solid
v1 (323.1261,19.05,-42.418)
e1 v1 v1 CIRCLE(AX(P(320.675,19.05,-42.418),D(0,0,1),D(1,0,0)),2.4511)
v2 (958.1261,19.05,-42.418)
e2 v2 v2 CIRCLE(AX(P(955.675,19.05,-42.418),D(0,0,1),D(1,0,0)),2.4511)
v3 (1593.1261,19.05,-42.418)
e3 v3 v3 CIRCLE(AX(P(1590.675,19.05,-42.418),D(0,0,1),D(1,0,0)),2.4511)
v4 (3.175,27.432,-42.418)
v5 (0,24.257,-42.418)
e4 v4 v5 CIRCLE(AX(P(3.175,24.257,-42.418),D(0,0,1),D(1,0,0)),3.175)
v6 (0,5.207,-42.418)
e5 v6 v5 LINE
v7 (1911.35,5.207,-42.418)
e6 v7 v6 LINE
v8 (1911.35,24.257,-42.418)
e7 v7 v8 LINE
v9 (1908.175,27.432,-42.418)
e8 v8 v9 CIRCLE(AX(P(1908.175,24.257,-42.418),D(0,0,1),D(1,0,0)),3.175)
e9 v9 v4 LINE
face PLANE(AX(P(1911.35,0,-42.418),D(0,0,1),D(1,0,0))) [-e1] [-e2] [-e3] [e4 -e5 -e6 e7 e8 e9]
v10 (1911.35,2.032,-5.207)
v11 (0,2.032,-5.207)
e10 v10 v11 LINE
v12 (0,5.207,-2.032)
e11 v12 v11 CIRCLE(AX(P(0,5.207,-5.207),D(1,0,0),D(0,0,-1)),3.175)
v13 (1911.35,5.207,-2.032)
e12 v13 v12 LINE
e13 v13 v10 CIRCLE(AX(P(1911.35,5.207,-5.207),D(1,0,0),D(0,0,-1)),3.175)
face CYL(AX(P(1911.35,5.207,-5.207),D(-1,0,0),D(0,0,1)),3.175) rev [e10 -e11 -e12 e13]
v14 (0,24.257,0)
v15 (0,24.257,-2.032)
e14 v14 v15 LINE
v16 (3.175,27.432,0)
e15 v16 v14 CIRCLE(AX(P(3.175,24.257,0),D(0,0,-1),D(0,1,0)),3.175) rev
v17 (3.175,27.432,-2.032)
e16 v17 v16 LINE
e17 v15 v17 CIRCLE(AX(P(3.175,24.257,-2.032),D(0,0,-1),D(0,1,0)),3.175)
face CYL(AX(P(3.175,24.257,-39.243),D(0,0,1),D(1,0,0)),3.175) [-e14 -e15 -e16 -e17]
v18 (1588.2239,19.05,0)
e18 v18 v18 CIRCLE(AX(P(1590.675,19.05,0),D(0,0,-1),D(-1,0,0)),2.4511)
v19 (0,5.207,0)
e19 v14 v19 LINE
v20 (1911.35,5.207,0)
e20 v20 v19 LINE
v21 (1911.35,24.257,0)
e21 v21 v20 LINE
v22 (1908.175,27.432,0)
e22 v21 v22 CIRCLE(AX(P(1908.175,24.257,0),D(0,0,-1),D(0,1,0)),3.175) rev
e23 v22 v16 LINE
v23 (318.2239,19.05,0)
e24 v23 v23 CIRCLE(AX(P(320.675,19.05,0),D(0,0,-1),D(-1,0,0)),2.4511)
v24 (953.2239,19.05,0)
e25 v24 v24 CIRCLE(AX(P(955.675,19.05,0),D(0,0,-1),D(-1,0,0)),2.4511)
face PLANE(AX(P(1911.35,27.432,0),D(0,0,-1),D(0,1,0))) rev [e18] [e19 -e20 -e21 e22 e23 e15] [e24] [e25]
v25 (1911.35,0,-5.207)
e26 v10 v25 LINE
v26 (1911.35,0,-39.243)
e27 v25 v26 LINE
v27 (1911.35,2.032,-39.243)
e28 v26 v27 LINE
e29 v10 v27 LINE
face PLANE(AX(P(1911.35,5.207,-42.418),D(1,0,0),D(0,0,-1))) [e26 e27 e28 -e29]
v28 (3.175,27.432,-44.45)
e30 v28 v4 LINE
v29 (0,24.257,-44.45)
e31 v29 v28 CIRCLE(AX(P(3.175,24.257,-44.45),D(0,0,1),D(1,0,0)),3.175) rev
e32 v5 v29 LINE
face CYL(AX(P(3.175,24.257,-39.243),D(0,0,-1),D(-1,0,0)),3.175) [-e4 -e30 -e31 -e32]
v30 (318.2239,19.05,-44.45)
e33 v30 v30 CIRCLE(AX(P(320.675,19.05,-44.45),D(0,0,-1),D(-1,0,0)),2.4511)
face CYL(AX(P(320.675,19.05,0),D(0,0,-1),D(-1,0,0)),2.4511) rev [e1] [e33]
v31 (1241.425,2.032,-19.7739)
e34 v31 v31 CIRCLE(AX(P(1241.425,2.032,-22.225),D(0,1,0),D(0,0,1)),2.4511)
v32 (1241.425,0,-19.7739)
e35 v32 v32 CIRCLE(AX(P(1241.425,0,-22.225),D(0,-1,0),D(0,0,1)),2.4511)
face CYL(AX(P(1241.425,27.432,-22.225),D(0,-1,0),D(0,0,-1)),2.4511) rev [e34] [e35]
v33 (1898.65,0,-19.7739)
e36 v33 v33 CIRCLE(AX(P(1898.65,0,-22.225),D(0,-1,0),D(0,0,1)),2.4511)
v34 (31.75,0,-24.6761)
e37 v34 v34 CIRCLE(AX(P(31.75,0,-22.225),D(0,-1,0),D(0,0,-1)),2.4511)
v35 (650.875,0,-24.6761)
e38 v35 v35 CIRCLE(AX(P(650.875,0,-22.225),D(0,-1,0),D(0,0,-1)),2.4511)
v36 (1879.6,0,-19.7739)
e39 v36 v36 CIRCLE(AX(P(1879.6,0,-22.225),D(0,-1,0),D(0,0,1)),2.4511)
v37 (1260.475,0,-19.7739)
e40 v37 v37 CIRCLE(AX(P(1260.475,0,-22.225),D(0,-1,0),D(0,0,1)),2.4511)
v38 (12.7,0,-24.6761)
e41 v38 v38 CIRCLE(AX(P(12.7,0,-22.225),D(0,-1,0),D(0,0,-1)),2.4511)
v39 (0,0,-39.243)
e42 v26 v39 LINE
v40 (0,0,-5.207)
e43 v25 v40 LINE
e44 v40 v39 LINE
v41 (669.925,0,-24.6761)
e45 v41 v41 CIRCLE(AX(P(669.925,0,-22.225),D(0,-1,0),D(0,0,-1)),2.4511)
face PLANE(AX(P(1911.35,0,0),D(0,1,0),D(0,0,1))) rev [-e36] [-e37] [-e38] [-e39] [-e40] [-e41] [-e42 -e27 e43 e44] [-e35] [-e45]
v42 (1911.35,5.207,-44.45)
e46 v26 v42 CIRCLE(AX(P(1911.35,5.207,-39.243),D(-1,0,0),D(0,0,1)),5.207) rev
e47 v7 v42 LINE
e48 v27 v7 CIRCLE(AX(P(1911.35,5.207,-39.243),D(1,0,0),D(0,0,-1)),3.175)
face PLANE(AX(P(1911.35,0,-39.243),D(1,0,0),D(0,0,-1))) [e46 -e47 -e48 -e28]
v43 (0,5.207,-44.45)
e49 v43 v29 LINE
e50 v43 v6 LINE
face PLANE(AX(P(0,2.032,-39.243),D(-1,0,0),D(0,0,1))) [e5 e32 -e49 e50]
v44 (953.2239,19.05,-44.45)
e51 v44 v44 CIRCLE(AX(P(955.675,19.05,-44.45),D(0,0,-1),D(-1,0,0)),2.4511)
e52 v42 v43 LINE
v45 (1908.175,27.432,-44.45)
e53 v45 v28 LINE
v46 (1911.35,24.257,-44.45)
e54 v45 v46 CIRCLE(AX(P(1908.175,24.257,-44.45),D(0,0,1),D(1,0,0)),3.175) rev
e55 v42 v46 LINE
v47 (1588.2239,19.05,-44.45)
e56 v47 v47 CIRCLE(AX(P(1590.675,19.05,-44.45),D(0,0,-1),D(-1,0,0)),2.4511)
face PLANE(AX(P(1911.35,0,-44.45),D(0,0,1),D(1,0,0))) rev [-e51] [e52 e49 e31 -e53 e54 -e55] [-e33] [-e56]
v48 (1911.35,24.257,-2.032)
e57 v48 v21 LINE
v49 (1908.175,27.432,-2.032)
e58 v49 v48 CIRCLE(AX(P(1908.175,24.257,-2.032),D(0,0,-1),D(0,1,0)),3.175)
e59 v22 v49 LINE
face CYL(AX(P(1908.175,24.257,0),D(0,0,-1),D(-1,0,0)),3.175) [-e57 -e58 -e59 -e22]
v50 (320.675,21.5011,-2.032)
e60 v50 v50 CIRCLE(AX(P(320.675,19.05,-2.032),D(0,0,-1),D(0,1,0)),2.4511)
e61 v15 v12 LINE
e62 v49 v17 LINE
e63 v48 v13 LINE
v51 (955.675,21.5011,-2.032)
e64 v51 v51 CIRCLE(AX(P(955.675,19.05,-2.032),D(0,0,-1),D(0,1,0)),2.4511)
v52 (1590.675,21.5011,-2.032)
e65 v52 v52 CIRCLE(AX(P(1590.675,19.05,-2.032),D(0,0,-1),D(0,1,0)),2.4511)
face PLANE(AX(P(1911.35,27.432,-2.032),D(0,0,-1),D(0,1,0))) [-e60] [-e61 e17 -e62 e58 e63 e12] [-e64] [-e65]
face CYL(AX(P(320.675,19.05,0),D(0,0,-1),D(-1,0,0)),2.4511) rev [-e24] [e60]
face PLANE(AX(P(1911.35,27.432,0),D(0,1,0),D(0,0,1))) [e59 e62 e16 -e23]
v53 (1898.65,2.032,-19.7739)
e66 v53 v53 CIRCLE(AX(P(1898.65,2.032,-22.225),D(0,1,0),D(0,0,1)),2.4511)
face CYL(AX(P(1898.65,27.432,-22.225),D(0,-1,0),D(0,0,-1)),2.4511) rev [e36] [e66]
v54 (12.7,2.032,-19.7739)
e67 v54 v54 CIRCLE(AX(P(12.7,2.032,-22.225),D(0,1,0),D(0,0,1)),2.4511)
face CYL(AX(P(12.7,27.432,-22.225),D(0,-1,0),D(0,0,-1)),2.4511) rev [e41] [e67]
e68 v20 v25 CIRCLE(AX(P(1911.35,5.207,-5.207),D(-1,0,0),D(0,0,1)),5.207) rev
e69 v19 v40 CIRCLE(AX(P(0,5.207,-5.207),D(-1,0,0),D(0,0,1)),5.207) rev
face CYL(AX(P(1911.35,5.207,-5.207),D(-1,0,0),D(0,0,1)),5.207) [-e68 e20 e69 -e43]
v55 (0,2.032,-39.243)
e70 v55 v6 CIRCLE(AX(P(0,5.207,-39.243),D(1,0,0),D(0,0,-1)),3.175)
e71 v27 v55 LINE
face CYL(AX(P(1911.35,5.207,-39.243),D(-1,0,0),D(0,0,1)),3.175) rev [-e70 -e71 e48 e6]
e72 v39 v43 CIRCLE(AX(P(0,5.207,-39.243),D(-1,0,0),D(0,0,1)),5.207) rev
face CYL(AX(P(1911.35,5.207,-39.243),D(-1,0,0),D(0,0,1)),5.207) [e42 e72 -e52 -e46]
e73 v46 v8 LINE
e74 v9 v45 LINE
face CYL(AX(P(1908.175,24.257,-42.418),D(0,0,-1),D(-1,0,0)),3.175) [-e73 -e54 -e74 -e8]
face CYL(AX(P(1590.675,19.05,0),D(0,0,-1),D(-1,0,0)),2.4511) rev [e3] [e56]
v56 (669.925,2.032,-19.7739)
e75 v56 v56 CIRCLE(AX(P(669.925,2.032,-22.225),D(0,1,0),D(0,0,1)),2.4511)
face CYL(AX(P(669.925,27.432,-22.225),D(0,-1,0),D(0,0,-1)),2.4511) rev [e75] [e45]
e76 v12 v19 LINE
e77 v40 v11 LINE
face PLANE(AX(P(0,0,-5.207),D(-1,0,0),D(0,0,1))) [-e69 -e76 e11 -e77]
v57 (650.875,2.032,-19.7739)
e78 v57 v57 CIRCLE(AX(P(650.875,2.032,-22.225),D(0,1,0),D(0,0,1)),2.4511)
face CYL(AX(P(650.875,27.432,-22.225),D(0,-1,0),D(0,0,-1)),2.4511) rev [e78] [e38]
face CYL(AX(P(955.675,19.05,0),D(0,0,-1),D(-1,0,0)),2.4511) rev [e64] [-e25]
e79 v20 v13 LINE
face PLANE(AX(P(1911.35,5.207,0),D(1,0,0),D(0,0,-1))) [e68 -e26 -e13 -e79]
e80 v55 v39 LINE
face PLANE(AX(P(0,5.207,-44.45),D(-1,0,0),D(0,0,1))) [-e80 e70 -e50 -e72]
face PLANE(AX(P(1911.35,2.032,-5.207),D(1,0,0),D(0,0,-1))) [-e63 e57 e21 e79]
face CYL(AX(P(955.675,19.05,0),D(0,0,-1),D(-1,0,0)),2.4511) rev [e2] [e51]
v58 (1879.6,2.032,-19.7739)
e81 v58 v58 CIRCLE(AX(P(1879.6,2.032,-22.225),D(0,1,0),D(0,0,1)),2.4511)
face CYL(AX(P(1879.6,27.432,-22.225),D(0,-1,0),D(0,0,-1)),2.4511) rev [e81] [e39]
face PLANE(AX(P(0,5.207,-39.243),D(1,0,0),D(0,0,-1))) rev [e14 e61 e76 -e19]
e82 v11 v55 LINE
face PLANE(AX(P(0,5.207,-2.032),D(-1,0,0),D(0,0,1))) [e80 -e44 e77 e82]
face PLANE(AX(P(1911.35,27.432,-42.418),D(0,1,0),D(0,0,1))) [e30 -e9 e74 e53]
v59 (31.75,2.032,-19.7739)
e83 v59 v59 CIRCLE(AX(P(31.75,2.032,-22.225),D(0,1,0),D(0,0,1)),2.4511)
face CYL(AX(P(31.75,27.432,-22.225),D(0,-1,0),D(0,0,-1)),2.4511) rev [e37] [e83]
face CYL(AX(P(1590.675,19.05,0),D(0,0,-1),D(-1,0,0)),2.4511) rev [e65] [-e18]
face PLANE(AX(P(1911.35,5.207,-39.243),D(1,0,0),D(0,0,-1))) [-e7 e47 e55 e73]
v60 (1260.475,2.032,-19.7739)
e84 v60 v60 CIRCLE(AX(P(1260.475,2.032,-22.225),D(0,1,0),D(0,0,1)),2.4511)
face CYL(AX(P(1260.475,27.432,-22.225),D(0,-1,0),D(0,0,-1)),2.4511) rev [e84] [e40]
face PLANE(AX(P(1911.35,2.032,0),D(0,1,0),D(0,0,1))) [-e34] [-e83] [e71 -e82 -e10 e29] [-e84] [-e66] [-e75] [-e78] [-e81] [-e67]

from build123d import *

# Parameters (mm, degrees)
BASE_FLANGE1_DEPTH = 1911.35
SKETCH2_R          = 2.4511
CUT_EXTRUDE1_DEPTH = 1913.06358148
SKETCH3_R          = 2.4511
CUT_EXTRUDE2_DEPTH = 1913.06358148
FILLET1_R          = 3.175


# Sheet-metal steps are written as plain solids
with BuildPart() as part:
    # Sketch1 → Base-Flange1 (new body)
    with BuildSketch(Plane(origin=(0, 0, 0), x_dir=(0, 0, -1), z_dir=(1, 0, 0))):
        with BuildLine():
            Line((0, 27.432), (0, 5.207))
            ThreePointArc((0, 5.207), (1.52509499, 1.52509499), (5.207, 0))
            Line((5.207, 0), (39.243, 0))
            ThreePointArc((39.243, 0), (42.92490501, 1.52509499), (44.45, 5.207))
            Line((44.45, 5.207), (44.45, 27.432))
            Line((44.45, 27.432), (42.418, 27.432))
            Line((42.418, 27.432), (42.418, 5.207))
            ThreePointArc((42.418, 5.207), (41.48806403, 2.96193597), (39.243, 2.032))
            Line((39.243, 2.032), (5.207, 2.032))
            ThreePointArc((5.207, 2.032), (2.96193597, 2.96193597), (2.032, 5.207))
            Line((2.032, 5.207), (2.032, 27.432))
            Line((2.032, 27.432), (0, 27.432))
        make_face()
    extrude(amount=BASE_FLANGE1_DEPTH)

    # Sketch2 → Cut-Extrude1 (cut, through all)
    with BuildSketch(Plane(origin=(0, 0, 0), x_dir=(-1, 0, 0), z_dir=(0, -1, 0))):
        with Locations(Location((-12.7, 22.225, 0), (0, 0, 90))):
            Circle(SKETCH2_R)
        with Locations(Location((-31.75, 22.225, 0), (0, 0, 90))):
            Circle(SKETCH2_R)
        with Locations(Location((-650.875, 22.225, 0), (0, 0, 90))):
            Circle(SKETCH2_R)
        with Locations(Location((-669.925, 22.225, 0), (0, 0, 90))):
            Circle(SKETCH2_R)
        with Locations(Location((-1898.65, 22.225, 0), (0, 0, 270))):
            Circle(SKETCH2_R)
        with Locations(Location((-1879.6, 22.225, 0), (0, 0, 270))):
            Circle(SKETCH2_R)
        with Locations(Location((-1260.475, 22.225, 0), (0, 0, 270))):
            Circle(SKETCH2_R)
        with Locations(Location((-1241.425, 22.225, 0), (0, 0, 270))):
            Circle(SKETCH2_R)
    extrude(amount=-CUT_EXTRUDE1_DEPTH, mode=Mode.SUBTRACT)

    # Sketch3 → Cut-Extrude2 (cut, through all)
    with BuildSketch(Plane(origin=(0, 0, -44.45), x_dir=(-1, 0, 0), z_dir=(0, 0, -1))):
        with Locations((-1590.675, 19.05)):
            Circle(SKETCH3_R)
        with Locations((-955.675, 19.05)):
            Circle(SKETCH3_R)
        with Locations((-320.675, 19.05)):
            Circle(SKETCH3_R)
    extrude(amount=-CUT_EXTRUDE2_DEPTH, mode=Mode.SUBTRACT)

    # Fillet1
    fillet1_edges = [part.edges().sort_by_distance(p)[0] for p in [
        (0, 27.432, -1.016),
        (0, 27.432, -43.434),
        (1911.35, 27.432, -1.016),
        (1911.35, 27.432, -43.434),
    ]]
    fillet(fillet1_edges, radius=FILLET1_R)


solid = part.part
